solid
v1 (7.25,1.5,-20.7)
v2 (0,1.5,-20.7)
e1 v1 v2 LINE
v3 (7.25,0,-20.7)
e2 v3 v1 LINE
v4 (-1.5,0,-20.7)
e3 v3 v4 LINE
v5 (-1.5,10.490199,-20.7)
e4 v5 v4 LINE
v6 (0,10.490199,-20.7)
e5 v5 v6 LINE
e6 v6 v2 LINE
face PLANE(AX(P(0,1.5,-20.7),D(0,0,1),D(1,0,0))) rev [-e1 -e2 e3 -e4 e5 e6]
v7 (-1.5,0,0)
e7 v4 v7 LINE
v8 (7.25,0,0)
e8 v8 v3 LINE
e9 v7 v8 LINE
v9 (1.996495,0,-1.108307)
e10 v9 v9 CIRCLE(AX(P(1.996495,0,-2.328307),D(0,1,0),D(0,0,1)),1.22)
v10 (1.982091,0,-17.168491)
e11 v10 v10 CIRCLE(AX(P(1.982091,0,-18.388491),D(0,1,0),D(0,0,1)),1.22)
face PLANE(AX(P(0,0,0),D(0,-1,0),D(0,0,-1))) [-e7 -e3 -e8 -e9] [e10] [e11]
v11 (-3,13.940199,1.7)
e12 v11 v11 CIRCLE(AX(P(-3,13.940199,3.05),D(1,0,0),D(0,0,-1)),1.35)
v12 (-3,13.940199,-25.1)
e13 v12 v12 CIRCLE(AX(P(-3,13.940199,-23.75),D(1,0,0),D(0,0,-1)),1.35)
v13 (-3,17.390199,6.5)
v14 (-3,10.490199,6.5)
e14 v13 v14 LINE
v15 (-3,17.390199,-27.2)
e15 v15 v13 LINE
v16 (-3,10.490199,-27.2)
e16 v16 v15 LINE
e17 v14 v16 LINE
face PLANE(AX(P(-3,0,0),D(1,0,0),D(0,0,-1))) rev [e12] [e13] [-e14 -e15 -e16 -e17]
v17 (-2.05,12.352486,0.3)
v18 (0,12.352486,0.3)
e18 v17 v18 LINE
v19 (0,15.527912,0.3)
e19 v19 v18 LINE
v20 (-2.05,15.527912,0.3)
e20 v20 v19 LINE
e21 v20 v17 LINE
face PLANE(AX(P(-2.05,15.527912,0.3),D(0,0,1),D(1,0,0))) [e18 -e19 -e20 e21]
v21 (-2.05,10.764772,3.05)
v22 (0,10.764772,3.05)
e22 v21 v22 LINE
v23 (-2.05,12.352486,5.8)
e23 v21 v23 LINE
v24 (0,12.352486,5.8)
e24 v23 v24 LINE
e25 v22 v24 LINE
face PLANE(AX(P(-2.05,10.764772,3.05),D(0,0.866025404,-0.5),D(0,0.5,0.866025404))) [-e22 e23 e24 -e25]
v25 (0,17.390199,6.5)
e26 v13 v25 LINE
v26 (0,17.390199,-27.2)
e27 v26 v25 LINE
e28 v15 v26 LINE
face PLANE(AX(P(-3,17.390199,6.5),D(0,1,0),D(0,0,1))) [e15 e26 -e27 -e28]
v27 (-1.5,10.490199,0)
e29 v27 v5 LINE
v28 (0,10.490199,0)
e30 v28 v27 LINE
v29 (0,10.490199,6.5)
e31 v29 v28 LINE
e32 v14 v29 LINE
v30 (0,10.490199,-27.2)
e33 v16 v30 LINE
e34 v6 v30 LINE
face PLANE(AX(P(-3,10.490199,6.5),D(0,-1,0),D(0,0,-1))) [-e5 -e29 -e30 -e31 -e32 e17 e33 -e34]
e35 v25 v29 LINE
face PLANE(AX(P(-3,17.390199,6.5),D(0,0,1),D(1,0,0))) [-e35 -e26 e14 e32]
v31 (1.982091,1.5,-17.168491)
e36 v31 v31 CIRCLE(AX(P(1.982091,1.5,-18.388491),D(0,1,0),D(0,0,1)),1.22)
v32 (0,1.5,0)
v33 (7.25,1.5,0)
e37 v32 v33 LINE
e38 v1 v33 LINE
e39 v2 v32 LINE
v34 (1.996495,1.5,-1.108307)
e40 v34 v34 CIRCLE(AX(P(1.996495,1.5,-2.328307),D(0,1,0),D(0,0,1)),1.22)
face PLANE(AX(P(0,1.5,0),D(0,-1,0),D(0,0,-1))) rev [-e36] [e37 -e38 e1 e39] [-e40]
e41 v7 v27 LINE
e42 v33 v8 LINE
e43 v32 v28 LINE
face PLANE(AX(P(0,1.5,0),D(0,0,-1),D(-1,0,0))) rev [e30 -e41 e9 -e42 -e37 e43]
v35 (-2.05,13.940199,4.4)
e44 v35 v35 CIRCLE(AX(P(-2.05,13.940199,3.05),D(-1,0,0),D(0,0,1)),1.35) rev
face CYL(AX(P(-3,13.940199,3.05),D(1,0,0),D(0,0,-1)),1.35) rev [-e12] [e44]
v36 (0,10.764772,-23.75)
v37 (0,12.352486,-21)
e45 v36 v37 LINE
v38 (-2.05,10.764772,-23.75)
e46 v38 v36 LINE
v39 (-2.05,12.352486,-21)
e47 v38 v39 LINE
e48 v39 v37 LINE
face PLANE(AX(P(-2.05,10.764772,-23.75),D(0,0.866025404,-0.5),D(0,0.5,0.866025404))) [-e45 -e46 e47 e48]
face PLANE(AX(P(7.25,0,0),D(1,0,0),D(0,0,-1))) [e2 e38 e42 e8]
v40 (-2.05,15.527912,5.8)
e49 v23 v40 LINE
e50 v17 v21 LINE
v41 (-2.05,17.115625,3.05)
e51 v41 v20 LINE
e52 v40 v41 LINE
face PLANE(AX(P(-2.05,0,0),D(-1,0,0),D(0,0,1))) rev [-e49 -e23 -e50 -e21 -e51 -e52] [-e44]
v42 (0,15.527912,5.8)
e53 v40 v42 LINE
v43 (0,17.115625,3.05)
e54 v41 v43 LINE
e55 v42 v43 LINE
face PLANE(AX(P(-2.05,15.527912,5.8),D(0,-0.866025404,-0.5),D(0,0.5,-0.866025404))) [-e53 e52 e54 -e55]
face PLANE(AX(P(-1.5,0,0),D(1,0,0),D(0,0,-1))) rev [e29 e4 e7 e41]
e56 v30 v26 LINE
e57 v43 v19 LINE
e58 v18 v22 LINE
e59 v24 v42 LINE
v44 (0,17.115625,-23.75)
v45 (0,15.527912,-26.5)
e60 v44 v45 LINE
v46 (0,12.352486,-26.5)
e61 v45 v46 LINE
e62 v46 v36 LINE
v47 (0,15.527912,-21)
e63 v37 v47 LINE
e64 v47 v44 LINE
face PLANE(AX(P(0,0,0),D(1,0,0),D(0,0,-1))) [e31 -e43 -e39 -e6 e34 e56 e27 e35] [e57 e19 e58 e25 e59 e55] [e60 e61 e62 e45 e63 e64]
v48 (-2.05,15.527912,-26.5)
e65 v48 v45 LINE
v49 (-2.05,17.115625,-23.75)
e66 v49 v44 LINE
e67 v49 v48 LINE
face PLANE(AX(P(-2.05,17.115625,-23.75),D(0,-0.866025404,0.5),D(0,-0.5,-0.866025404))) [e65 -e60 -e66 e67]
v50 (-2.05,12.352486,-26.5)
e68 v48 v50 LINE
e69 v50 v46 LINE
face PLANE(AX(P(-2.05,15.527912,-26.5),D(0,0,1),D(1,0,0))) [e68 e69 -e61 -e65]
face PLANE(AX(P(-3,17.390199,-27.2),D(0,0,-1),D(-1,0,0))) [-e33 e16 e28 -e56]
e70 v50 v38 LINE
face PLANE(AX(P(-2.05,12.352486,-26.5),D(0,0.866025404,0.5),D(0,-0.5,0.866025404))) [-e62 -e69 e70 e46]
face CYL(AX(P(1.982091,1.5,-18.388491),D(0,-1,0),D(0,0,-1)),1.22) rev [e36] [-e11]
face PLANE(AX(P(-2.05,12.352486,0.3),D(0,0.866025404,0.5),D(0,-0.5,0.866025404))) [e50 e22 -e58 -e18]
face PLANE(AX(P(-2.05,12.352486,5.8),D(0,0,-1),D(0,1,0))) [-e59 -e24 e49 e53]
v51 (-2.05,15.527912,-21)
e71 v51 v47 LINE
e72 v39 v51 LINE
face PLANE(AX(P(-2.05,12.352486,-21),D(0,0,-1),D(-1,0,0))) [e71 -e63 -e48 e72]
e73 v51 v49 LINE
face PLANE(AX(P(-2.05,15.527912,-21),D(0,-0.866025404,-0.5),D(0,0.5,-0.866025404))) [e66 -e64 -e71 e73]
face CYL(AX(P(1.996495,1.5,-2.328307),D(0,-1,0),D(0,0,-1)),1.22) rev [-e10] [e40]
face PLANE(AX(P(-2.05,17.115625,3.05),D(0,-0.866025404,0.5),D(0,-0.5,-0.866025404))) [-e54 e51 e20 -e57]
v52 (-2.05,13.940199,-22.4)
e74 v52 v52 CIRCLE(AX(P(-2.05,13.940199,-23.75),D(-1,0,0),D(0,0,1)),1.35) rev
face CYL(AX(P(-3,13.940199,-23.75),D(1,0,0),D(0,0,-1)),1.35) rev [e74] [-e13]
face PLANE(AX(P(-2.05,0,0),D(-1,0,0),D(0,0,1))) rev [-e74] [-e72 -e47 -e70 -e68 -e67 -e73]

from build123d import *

# Parameters (mm, degrees)
SKETCH2_W               = 17.75
SKETCH2_H               = 20.7
SKETCH2_R               = 1.22
BOSS_EXTRUDE1_DEPTH     = 1.5
SKETCH12_W              = 20.7
SKETCH12_H              = 1.5
CUT_EXTRUDE2_DEPTH      = 10.5
SKETCH5_W               = 20.7
SKETCH5_H               = 8.940198937
BOSS_EXTRUDE3_DEPTH     = 1.5
SKETCH25_W              = 1.5
SKETCH25_H              = 20.7
BOSS_EXTRUDE5_DEPTH     = 4.5
SKETCH26_W              = 33.7
SKETCH26_H              = 6.9
SKETCH26_R              = 1.35
BOSS_EXTRUDE9_DEPTH     = 3
CUT_EXTRUDE3_DEPTH      = 0.55
CUT_EXTRUDE3_DEPTH_BACK = 1.5


with BuildPart() as part:
    # Sketch2 → Boss-Extrude1 (new body)
    with BuildSketch(Plane(origin=(0, 0, 0), x_dir=(1, 0, 0), z_dir=(0, 1, 0))):
        with Locations((8.875, 10.35)):
            Rectangle(SKETCH2_W, SKETCH2_H)
        with Locations((1.996494824, 2.32830664)):
            Circle(SKETCH2_R, mode=Mode.SUBTRACT)
        with Locations((1.982091411, 18.38849058)):
            Circle(SKETCH2_R, mode=Mode.SUBTRACT)
    extrude(amount=BOSS_EXTRUDE1_DEPTH)

    # Sketch12 → Cut-Extrude2 (cut)
    with BuildSketch(Plane(origin=(17.75, 0, 0), x_dir=(0, 0, -1), z_dir=(1, 0, 0))):
        with Locations((10.35, 0.75)):
            Rectangle(SKETCH12_W, SKETCH12_H)
    extrude(amount=-CUT_EXTRUDE2_DEPTH, mode=Mode.SUBTRACT)

    # Sketch5 → Boss-Extrude3 (add)
    with BuildSketch(Plane.ZY):
        with Locations((-10.35, 4.470099468)):
            Rectangle(SKETCH5_W, SKETCH5_H)
    extrude(amount=BOSS_EXTRUDE3_DEPTH)

    # Sketch25 → Boss-Extrude5 (add)
    with BuildSketch(Plane(origin=(0, 8.940198937, 0), x_dir=(1, 0, 0), z_dir=(0, 1, 0))):
        with Locations((-0.75, 10.35)):
            Rectangle(SKETCH25_W, SKETCH25_H)
    extrude(amount=BOSS_EXTRUDE5_DEPTH)

    # Sketch26 → Boss-Extrude9 (add)
    with BuildSketch(Plane(origin=(0, 0, 0), x_dir=(0, 0, -1), z_dir=(1, 0, 0))):
        with Locations((10.35, 13.940198937)):
            Rectangle(SKETCH26_W, SKETCH26_H)
        with Locations((23.75, 13.940198937)):
            Circle(SKETCH26_R, mode=Mode.SUBTRACT)
        with Locations((-3.05, 13.940198937)):
            Circle(SKETCH26_R, mode=Mode.SUBTRACT)
    extrude(amount=-BOSS_EXTRUDE9_DEPTH)

    # Sketch29 → Cut-Extrude3 (cut, two sides: drawn at the far end of the back side and taken through both)
    with BuildSketch(Plane.ZY.offset(1.5).offset(-CUT_EXTRUDE3_DEPTH_BACK)):
        Polygon((-26.5, 12.352485697), (-23.75, 10.764772456), (-21, 12.352485697), (-21, 15.527912177), (-23.75, 17.115625417), (-26.5, 15.527912177), align=None)
        Polygon((0.3, 12.352485697), (3.05, 10.764772456), (5.8, 12.352485697), (5.8, 15.527912177), (3.05, 17.115625417), (0.3, 15.527912177), align=None)
    extrude(amount=CUT_EXTRUDE3_DEPTH + CUT_EXTRUDE3_DEPTH_BACK, mode=Mode.SUBTRACT)


solid = part.part
